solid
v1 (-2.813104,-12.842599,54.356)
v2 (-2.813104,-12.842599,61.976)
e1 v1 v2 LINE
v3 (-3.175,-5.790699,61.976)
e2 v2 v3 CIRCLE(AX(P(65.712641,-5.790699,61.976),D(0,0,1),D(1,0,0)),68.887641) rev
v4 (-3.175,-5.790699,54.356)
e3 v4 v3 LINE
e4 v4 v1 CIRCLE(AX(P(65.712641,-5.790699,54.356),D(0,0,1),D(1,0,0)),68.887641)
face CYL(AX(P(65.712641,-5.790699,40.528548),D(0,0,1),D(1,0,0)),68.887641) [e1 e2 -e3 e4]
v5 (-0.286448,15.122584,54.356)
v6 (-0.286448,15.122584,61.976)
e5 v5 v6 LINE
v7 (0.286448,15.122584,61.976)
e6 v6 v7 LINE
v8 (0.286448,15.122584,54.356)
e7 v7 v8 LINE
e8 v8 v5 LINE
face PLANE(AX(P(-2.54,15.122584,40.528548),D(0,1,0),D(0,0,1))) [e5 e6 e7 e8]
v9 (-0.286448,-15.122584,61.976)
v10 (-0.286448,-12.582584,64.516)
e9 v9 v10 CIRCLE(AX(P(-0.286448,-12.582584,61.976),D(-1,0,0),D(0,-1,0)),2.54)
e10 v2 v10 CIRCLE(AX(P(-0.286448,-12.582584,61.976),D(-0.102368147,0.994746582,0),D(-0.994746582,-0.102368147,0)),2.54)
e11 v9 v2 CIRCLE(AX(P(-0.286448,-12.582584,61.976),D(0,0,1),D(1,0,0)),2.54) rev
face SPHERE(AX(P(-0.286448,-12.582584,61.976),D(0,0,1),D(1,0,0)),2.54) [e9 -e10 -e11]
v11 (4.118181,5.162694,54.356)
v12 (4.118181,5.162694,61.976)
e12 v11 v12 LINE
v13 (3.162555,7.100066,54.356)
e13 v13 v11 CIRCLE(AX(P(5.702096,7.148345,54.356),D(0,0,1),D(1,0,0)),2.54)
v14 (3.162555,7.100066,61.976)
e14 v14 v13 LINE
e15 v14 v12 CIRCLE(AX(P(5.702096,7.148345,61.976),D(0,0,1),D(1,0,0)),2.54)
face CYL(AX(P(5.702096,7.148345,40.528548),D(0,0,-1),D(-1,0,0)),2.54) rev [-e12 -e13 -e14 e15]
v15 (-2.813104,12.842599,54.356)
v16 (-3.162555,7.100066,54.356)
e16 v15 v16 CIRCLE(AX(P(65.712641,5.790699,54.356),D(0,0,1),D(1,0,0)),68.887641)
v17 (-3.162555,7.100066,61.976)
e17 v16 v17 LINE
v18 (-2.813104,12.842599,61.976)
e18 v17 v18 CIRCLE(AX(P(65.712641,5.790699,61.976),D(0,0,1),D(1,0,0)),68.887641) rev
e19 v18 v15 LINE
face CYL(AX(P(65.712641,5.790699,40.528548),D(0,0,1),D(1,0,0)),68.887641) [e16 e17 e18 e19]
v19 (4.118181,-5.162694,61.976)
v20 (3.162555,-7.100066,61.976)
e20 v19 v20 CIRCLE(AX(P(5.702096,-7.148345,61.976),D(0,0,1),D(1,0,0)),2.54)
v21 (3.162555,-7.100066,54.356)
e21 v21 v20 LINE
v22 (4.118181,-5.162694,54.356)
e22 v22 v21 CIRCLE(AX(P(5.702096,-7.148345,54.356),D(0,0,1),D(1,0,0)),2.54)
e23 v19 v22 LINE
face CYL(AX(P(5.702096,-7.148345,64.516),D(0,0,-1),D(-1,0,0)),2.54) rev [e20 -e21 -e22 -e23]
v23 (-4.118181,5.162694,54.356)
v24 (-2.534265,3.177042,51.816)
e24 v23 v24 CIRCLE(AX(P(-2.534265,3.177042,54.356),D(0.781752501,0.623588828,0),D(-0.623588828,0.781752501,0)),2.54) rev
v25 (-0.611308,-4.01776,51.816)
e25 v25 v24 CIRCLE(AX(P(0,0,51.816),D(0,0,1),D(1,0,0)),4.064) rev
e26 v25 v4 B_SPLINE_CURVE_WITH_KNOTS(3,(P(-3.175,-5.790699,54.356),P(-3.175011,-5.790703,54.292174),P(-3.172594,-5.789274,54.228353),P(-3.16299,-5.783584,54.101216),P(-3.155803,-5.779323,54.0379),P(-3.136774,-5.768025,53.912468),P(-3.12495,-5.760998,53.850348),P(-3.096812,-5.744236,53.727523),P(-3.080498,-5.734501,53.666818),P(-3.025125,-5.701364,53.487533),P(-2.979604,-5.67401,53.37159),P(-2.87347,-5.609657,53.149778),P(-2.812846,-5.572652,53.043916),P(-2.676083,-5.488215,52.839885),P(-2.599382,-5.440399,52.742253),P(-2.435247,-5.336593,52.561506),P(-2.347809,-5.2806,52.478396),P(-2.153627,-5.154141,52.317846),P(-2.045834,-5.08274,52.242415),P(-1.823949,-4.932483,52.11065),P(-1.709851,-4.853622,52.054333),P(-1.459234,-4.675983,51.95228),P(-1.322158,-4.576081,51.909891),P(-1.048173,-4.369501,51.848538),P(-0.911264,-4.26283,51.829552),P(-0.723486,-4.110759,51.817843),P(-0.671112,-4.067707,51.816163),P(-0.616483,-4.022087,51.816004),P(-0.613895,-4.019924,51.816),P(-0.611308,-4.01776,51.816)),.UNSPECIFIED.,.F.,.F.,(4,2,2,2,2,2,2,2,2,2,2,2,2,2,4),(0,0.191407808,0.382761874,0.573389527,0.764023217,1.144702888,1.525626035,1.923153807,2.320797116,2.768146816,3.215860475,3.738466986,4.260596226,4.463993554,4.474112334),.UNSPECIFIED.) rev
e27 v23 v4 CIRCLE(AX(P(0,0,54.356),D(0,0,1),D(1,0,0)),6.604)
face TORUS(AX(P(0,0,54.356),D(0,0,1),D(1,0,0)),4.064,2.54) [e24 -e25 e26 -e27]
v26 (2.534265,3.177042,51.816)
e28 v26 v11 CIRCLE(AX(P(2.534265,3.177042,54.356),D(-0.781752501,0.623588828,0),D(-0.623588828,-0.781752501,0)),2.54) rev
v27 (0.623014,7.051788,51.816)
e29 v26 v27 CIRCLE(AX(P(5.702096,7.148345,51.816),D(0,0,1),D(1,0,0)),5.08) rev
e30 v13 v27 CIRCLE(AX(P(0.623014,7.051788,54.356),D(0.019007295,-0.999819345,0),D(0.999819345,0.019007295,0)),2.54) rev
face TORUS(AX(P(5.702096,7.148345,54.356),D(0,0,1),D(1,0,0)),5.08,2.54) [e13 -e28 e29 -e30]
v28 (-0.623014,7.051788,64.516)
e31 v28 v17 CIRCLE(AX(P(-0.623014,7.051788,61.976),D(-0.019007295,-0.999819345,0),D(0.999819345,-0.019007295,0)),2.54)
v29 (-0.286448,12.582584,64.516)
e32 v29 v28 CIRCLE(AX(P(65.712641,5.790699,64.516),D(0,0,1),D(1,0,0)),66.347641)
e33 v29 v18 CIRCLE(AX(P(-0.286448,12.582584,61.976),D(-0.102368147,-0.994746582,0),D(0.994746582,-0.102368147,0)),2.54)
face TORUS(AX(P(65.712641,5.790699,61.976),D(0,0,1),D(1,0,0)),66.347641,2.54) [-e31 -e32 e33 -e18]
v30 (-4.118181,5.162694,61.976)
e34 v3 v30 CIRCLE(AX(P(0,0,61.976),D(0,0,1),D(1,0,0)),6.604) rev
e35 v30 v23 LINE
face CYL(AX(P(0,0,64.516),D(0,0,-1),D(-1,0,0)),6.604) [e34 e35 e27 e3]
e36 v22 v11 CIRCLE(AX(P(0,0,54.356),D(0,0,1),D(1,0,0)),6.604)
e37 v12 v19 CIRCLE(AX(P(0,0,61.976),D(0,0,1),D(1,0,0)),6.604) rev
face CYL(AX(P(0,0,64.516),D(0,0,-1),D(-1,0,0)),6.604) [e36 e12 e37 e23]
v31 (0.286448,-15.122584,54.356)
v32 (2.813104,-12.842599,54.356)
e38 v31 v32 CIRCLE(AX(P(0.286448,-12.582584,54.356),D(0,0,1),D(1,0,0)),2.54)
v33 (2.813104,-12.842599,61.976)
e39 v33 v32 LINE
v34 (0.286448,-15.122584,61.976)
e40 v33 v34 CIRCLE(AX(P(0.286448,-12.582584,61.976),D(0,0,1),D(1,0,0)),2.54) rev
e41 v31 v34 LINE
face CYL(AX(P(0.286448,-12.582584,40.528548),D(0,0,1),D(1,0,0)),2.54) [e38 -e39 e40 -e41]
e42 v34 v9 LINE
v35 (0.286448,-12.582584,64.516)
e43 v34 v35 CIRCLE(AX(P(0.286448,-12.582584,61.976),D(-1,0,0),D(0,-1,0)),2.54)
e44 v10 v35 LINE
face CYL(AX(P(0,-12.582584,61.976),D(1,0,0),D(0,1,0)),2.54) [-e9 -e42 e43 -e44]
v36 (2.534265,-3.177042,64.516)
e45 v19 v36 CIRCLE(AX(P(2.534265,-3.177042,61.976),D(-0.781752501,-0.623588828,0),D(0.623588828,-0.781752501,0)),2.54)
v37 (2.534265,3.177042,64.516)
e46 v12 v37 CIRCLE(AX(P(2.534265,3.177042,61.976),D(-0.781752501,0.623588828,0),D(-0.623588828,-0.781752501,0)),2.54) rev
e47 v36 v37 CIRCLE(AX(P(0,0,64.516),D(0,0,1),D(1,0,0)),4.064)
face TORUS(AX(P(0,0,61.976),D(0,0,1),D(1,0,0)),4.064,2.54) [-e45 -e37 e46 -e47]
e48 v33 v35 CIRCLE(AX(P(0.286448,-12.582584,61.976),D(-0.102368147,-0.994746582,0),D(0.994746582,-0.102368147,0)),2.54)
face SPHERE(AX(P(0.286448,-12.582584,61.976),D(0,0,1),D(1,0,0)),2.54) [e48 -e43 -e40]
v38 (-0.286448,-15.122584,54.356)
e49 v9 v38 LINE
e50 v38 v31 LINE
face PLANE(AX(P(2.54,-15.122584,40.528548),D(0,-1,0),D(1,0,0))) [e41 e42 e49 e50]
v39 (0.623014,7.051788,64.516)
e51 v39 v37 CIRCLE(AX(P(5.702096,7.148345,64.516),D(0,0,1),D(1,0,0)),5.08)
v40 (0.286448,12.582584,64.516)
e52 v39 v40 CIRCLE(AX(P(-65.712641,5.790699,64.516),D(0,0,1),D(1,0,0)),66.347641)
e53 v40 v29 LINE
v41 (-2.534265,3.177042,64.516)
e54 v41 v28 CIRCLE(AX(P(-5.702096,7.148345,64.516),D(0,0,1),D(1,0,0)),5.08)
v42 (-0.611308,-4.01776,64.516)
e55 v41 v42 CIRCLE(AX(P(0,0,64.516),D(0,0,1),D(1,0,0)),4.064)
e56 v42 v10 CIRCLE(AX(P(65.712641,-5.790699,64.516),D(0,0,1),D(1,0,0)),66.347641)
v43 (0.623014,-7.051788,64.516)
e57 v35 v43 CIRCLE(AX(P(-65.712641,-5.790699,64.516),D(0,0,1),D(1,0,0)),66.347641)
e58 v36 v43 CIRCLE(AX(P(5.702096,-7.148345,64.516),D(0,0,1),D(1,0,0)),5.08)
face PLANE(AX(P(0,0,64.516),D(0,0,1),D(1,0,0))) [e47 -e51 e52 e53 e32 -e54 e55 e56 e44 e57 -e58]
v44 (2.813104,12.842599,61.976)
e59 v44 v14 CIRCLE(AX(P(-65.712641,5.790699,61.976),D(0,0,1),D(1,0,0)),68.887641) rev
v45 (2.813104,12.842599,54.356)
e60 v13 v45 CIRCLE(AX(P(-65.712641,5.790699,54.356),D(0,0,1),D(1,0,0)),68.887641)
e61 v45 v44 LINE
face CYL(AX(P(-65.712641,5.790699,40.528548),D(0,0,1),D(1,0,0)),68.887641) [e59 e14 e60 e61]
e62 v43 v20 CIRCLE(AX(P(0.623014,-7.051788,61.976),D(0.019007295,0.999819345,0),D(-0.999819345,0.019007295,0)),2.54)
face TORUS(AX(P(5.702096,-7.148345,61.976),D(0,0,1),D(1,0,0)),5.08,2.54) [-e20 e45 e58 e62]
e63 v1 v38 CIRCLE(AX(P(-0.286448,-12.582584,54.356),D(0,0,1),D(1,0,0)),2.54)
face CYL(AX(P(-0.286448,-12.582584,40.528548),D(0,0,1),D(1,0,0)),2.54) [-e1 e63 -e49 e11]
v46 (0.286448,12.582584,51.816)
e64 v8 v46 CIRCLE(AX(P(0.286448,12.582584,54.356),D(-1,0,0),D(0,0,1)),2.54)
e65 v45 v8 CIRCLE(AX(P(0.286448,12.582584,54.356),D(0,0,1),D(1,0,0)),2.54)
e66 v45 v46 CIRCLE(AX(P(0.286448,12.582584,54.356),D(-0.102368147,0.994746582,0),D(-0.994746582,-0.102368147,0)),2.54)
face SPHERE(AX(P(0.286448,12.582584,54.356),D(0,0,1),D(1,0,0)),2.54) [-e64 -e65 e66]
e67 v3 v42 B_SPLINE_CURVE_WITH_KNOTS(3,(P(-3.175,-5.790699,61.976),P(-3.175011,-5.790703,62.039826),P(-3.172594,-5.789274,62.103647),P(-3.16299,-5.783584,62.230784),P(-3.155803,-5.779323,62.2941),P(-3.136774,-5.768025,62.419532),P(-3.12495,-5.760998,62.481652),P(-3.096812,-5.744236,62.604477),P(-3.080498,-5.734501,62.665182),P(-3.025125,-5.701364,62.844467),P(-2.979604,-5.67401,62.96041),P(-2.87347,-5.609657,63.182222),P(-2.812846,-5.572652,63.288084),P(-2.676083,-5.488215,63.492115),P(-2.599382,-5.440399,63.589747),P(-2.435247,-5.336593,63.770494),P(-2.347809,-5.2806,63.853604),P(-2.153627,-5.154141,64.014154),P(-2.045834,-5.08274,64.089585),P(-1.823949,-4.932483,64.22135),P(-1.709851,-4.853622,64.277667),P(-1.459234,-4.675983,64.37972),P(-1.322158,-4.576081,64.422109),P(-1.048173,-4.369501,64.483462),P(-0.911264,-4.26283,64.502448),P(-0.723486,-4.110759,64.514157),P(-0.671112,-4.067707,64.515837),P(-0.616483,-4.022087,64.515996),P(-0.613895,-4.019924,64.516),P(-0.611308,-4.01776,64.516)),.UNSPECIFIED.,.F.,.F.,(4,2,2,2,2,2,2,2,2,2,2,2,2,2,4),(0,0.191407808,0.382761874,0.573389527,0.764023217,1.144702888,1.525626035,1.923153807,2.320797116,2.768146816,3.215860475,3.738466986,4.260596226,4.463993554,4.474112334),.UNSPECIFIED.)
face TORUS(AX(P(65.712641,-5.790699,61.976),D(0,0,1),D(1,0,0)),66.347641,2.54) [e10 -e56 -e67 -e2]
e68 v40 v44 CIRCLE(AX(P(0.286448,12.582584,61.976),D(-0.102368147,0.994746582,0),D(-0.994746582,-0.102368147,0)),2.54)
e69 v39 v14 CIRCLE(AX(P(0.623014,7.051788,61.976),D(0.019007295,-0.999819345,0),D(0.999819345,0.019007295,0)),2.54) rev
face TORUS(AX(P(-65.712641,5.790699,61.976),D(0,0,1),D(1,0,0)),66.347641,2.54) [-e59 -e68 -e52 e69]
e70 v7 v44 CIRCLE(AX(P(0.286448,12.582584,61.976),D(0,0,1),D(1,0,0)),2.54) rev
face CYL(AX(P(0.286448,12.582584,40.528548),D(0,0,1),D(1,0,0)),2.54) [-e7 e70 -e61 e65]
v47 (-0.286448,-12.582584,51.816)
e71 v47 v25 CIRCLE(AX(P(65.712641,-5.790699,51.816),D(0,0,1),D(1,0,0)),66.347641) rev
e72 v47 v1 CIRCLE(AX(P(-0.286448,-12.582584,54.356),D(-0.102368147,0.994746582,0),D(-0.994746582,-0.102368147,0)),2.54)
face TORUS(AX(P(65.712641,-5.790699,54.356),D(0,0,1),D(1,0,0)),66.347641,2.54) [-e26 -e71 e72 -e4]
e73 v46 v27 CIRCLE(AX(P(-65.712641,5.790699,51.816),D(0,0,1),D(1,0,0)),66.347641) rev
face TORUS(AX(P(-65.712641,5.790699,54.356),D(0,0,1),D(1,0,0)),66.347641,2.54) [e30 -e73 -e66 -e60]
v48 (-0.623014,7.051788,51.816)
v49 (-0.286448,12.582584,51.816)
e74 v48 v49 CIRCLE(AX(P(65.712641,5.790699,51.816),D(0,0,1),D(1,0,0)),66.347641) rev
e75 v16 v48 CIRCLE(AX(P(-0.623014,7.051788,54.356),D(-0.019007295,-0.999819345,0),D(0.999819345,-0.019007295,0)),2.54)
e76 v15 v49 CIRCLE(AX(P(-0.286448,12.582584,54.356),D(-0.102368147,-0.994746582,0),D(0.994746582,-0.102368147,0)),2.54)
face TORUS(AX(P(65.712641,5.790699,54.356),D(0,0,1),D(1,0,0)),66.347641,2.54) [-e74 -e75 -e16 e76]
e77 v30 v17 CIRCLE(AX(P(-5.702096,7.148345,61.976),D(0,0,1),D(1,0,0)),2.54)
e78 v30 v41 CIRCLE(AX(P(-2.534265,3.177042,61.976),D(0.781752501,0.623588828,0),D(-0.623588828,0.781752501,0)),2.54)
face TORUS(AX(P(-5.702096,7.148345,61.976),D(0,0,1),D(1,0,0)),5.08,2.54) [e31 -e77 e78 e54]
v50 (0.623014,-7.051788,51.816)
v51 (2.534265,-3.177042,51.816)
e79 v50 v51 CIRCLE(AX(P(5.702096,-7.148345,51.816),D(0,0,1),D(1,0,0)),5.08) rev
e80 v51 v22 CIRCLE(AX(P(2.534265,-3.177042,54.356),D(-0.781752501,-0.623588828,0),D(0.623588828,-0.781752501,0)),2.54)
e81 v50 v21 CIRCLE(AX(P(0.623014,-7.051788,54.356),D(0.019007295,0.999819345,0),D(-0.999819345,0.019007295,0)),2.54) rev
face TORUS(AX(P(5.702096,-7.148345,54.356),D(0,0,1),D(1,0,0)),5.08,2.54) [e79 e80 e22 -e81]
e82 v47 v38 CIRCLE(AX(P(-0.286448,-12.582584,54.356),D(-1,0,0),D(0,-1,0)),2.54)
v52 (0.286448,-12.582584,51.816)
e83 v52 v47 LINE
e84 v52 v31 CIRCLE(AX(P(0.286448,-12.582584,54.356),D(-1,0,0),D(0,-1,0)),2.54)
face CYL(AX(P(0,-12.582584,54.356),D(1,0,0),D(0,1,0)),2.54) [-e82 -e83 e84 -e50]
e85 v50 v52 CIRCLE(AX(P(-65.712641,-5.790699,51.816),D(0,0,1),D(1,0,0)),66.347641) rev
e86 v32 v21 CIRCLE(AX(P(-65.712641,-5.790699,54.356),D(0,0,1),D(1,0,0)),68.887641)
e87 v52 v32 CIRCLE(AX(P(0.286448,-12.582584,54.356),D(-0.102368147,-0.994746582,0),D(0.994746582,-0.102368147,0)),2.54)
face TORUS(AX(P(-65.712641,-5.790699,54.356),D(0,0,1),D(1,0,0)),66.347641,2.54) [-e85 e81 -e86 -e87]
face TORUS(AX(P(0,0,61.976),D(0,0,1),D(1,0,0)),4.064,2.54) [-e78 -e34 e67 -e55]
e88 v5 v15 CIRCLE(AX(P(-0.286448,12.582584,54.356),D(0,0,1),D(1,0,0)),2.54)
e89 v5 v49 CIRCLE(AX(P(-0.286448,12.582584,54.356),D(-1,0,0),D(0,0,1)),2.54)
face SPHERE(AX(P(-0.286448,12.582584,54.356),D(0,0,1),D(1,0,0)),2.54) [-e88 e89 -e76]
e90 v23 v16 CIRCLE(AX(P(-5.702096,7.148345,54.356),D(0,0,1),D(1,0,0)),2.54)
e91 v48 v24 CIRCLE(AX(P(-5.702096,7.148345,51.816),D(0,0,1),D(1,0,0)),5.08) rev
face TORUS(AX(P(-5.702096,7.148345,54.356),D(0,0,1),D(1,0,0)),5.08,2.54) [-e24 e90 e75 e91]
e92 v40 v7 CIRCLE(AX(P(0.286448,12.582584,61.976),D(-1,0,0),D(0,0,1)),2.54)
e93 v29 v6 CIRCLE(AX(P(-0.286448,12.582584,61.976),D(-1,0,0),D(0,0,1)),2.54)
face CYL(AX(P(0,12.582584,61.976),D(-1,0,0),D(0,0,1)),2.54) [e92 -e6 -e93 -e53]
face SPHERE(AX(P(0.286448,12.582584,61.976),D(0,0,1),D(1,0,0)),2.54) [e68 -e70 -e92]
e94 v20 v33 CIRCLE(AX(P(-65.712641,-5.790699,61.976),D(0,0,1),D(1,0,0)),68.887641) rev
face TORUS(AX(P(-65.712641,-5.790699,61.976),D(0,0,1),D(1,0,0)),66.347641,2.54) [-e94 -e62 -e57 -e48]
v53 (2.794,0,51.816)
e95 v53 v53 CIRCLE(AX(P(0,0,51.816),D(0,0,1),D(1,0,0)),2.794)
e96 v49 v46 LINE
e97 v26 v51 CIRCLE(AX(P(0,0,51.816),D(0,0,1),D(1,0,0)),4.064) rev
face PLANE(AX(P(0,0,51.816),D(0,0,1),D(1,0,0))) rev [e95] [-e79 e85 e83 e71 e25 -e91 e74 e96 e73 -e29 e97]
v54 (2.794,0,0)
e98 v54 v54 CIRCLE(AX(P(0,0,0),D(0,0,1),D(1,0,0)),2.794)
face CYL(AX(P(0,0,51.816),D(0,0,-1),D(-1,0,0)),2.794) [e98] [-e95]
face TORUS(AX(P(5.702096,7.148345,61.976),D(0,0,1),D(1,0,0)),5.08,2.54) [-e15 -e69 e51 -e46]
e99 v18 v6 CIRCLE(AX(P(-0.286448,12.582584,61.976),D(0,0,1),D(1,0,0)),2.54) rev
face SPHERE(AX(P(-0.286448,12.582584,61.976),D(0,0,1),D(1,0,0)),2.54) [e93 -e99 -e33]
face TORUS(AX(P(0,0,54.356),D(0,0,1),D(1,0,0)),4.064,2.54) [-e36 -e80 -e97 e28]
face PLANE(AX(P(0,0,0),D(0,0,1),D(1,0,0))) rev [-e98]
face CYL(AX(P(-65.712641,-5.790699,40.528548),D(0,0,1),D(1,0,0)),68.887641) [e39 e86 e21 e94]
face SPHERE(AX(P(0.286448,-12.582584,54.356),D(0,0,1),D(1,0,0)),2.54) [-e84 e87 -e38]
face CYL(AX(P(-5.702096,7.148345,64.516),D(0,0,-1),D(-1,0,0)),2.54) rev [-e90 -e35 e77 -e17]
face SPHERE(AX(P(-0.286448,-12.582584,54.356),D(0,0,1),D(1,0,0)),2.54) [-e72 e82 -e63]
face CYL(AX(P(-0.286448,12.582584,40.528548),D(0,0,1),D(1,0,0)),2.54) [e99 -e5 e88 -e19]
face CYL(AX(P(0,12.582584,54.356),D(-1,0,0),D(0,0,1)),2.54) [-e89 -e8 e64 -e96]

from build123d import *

# Parameters (mm, degrees)
SKETCH1_R      = 2.794
EXTRUDE1_DEPTH = 51.816
SKETCH2_R      = 6.604
EXTRUDE2_DEPTH = 12.7
EXTRUDE3_START = -12.7
EXTRUDE3_DEPTH = 12.7
FILLET1_R      = 2.54
FILLET2_R      = 2.54


with BuildPart() as part:
    # Sketch1 → Extrude1 (new body)
    with BuildSketch(Plane.XY):
        Circle(SKETCH1_R)
    extrude(amount=EXTRUDE1_DEPTH)

    # Sketch2 → Extrude2 (add)
    with BuildSketch(Plane.XY.offset(51.816)):
        Circle(SKETCH2_R)
    extrude(amount=EXTRUDE2_DEPTH)

    # Sketch3 → Extrude3 (add)
    with BuildSketch(Plane.XY.offset(64.516).offset(EXTRUDE3_START)):
        with BuildLine():
            Line((-2.54, 15.122583735), (2.54, 15.122583735))
            ThreePointArc((2.54, 15.122583735), (3.016066659, 10.467431069), (3.175, 5.790698663))
            ThreePointArc((3.175, 5.790698663), (0, 6.604), (-3.175, 5.790698663))
            ThreePointArc((-3.175, 5.790698663), (-3.016066659, 10.467431069), (-2.54, 15.122583735))
        make_face()
        with BuildLine():
            Line((2.54, -15.122583735), (-2.54, -15.122583735))
            ThreePointArc((-2.54, -15.122583735), (-3.016066659, -10.467431069), (-3.175, -5.790698663))
            ThreePointArc((-3.175, -5.790698663), (0, -6.604), (3.175, -5.790698663))
            ThreePointArc((3.175, -5.790698663), (3.016066659, -10.467431069), (2.54, -15.122583735))
        make_face()
    extrude(amount=EXTRUDE3_DEPTH)

    # Fillet1
    fillet1_edges = [part.edges().sort_by_distance(p)[0] for p in [
        (-2.54, 15.122583735, 58.166),
        (2.54, 15.122583735, 58.166),
        (2.54, -15.122583735, 58.166),
        (-2.54, -15.122583735, 58.166),
    ]]
    fillet(fillet1_edges, radius=FILLET1_R)

    # Fillet2
    fillet2_edges = [part.edges().sort_by_distance(p)[0] for p in [
        (-3.175, 5.790698663, 58.166),
        (3.175, 5.790698663, 58.166),
        (3.175, -5.790698663, 58.166),
    ]]
    fillet(fillet2_edges, radius=FILLET2_R)
    fillet2_2_edges = [part.edges().sort_by_distance(p)[0] for p in [
        (-6.57965204, -0.566564238, 51.816),
        (3.047804414, 9.974982228, 64.516),
        (-3.047804414, 9.974982228, 51.816),
        (6.604, 0, 64.516),
        (6.604, 0, 51.816),
        (-3.084466617, -9.321288711, 64.516),
        (3.047804414, -9.974982228, 51.816),
        (-3.084466617, -9.321288711, 51.816),
        (0, -15.122583735, 64.516),
        (3.047804414, -9.974982228, 64.516),
        (0, 15.122583735, 64.516),
        (-3.047804414, 9.974982228, 64.516),
        (1.98808874, 14.468324748, 64.516),
        (-1.98808874, 14.468324748, 64.516),
        (1.98808874, -14.468324748, 64.516),
        (-1.98808874, -14.468324748, 64.516),
        (0, -15.122583735, 51.816),
        (0, 15.122583735, 51.816),
        (3.047804414, 9.974982228, 51.816),
        (1.98808874, 14.468324748, 51.816),
        (-1.98808874, 14.468324748, 51.816),
        (1.98808874, -14.468324748, 51.816),
        (-1.98808874, -14.468324748, 51.816),
        (-6.57965204, -0.566564238, 64.516),
        (-3.424141618, 6.02472451, 64.516),
        (3.424141618, 6.02472451, 51.816),
        (3.424141618, -6.02472451, 64.516),
        (3.424141618, -6.02472451, 51.816),
        (3.424141618, 6.02472451, 64.516),
        (-3.424141618, 6.02472451, 51.816),
    ]]
    fillet(fillet2_2_edges, radius=FILLET2_R)


solid = part.part
